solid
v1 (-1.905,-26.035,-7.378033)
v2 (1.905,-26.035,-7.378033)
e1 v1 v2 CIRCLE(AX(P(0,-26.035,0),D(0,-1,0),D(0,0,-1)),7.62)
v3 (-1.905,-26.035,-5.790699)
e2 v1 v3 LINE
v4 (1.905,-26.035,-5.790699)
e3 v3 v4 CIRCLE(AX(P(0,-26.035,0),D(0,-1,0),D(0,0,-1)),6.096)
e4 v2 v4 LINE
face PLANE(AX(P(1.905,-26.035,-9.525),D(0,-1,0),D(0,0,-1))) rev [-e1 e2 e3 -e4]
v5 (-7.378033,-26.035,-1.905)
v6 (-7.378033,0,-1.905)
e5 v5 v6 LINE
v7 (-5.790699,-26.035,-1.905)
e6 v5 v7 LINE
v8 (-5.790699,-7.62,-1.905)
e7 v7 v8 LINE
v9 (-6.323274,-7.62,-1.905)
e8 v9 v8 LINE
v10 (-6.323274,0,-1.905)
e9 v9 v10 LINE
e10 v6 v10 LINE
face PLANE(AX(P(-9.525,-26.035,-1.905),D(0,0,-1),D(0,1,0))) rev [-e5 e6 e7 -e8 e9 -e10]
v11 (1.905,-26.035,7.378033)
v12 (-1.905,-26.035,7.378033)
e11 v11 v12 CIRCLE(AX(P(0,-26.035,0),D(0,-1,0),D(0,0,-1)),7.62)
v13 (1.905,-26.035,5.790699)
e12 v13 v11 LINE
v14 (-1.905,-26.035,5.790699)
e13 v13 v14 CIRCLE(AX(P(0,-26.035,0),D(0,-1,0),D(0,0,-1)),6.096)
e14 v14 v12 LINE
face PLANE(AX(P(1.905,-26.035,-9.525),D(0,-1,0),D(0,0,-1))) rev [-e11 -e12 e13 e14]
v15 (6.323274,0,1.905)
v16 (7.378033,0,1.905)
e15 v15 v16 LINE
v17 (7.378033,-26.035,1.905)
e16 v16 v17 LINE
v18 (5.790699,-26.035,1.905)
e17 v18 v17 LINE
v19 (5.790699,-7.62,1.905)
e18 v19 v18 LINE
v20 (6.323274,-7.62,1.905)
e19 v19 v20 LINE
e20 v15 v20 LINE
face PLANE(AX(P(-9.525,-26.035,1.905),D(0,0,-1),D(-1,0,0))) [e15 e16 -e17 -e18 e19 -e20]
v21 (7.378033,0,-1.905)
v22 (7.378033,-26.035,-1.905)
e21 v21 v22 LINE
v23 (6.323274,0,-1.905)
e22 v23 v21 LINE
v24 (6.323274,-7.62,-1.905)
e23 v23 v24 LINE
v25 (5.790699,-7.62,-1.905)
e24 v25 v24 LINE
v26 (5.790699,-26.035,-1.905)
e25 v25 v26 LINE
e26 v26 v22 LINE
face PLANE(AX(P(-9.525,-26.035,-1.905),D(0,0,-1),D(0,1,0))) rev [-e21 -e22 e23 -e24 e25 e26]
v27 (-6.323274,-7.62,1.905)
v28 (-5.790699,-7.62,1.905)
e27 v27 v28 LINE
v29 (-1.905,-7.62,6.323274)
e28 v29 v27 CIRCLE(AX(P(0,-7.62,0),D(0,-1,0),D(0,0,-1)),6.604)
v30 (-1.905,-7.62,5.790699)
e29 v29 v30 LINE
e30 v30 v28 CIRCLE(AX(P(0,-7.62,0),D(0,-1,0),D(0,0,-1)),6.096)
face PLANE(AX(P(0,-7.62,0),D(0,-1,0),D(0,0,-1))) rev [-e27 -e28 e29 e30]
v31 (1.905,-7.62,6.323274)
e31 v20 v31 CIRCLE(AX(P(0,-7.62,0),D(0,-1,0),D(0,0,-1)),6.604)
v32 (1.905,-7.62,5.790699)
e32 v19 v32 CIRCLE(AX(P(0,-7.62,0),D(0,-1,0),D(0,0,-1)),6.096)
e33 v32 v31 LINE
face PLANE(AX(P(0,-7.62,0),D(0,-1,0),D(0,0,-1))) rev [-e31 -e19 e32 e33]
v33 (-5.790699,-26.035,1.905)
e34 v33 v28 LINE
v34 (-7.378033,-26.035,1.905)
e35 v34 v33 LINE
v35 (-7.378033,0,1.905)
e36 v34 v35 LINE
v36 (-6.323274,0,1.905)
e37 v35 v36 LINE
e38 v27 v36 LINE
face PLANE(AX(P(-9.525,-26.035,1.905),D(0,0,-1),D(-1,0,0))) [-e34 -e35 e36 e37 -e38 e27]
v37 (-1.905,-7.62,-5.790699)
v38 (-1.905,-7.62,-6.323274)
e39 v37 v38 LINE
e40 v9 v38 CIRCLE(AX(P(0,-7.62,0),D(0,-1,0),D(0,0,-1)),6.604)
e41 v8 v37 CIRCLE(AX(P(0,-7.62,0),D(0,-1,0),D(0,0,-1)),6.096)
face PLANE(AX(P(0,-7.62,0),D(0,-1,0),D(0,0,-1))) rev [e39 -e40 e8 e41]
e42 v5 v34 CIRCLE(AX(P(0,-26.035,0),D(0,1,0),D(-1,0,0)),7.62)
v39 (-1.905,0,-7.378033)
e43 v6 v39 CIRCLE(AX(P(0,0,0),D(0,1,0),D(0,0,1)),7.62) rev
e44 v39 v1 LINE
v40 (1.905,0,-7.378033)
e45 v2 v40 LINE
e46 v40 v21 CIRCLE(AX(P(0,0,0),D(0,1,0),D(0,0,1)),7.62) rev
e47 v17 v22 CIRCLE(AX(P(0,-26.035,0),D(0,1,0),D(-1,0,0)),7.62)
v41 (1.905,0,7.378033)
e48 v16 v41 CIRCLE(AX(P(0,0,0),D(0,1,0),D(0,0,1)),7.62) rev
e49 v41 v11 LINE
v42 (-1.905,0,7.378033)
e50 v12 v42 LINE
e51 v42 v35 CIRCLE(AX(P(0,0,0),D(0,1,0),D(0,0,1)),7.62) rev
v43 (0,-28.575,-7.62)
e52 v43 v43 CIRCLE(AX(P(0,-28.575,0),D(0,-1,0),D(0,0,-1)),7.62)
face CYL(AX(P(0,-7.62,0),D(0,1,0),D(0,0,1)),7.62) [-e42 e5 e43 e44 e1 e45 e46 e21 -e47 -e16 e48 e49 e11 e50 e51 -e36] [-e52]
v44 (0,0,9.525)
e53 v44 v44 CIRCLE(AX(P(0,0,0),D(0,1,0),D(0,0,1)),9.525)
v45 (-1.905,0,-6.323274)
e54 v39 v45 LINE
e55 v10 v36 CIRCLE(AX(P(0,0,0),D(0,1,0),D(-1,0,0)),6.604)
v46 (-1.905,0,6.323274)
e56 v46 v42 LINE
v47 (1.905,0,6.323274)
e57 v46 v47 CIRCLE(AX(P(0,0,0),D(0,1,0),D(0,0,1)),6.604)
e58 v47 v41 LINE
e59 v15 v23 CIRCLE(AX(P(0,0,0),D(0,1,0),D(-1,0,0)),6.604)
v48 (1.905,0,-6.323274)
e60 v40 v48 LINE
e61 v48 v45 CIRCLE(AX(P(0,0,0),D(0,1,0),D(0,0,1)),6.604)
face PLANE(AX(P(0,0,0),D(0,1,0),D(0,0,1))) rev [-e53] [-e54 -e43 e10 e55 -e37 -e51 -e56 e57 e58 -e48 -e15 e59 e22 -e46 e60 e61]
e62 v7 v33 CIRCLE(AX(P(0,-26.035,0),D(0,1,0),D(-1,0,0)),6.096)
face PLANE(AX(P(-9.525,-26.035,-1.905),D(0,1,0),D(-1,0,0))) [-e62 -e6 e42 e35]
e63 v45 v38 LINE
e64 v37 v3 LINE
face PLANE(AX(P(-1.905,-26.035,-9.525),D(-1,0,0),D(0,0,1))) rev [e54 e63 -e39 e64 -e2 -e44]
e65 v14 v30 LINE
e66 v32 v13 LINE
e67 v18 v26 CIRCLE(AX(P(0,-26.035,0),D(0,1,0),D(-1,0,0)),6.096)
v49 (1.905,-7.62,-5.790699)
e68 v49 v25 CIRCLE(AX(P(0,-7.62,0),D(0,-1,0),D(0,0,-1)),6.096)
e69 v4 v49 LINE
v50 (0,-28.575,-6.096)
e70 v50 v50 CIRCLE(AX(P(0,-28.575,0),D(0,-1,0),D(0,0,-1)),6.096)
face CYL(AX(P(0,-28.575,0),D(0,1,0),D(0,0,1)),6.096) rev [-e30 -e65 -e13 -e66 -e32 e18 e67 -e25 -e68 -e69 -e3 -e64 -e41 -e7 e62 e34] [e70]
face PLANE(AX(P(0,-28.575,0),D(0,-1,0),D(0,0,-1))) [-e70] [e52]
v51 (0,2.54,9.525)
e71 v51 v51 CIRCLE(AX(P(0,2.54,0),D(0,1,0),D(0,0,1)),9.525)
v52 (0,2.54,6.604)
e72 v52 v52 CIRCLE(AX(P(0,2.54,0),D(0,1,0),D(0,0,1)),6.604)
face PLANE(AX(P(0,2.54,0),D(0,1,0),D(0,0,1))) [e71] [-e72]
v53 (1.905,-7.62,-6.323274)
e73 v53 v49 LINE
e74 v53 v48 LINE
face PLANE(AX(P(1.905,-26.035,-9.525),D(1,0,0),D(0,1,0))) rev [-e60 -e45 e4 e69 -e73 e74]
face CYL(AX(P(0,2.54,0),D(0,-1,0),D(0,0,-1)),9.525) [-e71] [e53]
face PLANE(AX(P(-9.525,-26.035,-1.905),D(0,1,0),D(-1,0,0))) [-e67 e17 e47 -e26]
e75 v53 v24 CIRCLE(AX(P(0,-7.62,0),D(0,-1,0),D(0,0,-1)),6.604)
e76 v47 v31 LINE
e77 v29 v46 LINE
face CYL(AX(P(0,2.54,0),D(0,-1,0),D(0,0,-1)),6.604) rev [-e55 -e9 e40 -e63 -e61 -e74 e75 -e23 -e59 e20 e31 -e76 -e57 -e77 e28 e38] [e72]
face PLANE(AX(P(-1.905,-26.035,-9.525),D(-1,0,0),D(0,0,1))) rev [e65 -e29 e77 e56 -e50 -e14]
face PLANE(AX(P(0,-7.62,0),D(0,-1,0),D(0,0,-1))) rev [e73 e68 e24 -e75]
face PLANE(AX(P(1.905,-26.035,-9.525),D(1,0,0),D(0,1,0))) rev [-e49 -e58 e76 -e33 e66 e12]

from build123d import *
from build123d.topology import SkipClean

# Parameters (mm, degrees)
SKETCH1_R           = 9.525
SKETCH1_R_2         = 6.604
BOSS_EXTRUDE1_DEPTH = 2.54
BOSS_EXTRUDE2_START = 7.62
SKETCH2_R           = 7.62
SKETCH2_R_2         = 6.604
BOSS_EXTRUDE2_DEPTH = 7.62
BOSS_EXTRUDE3_START = 20.955
SKETCH3_R           = 7.62
SKETCH3_R_2         = 6.096
BOSS_EXTRUDE3_DEPTH = 20.955
SKETCH5_W           = 3.81
SKETCH5_H           = 26.035
CUT_EXTRUDE1_DEPTH  = 37.780699762
SKETCH7_W           = 3.81
SKETCH7_H           = 26.035
CUT_EXTRUDE2_DEPTH  = 37.780699762


with BuildPart() as part:
    # Sketch1 → Boss-Extrude1 (new body)
    with BuildSketch(Plane(origin=(0, 0, 0), x_dir=(1, 0, 0), z_dir=(0, 1, 0))):
        Circle(SKETCH1_R)
        Circle(SKETCH1_R_2, mode=Mode.SUBTRACT)
    extrude(amount=BOSS_EXTRUDE1_DEPTH)

    # Sketch2 → Boss-Extrude2 (add)
    with SkipClean():  # the faces are left unmerged after this step: merging them gives an invalid solid
        with BuildSketch(Plane(origin=(0, 0, 0), x_dir=(-1, 0, 0), z_dir=(0, -1, 0)).offset(BOSS_EXTRUDE2_START)):
            Circle(SKETCH2_R)
            Circle(SKETCH2_R_2, mode=Mode.SUBTRACT)
        extrude(amount=-BOSS_EXTRUDE2_DEPTH)

    # Sketch3 → Boss-Extrude3 (add)
    with SkipClean():  # the faces are left unmerged after this step: merging them gives an invalid solid
        with BuildSketch(Plane(origin=(0, -7.62, 0), x_dir=(-1, 0, 0), z_dir=(0, -1, 0)).offset(BOSS_EXTRUDE3_START)):
            Circle(SKETCH3_R)
            Circle(SKETCH3_R_2, mode=Mode.SUBTRACT)
        extrude(amount=-BOSS_EXTRUDE3_DEPTH)

    # Sketch5 → Cut-Extrude1 (cut, through all)
    with SkipClean():  # the faces are left unmerged after this step: merging them gives an invalid solid
        with BuildSketch(Plane(origin=(0, -28.575, 7.62), x_dir=(1, 0, 0), z_dir=(0, 0, 1))):
            with Locations((0, 15.5575)):
                Rectangle(SKETCH5_W, SKETCH5_H)
        extrude(amount=-CUT_EXTRUDE1_DEPTH, mode=Mode.SUBTRACT)

    # Sketch7 → Cut-Extrude2 (cut, through all)
    with SkipClean():  # the faces are left unmerged after this step: merging them gives an invalid solid
        with BuildSketch(Plane(origin=(7.62, -28.575, 0), x_dir=(0, 0, -1), z_dir=(1, 0, 0))):
            with Locations((0, 15.5575)):
                Rectangle(SKETCH7_W, SKETCH7_H)
        extrude(amount=-CUT_EXTRUDE2_DEPTH, mode=Mode.SUBTRACT)
    add(part.part.scale(1), mode=Mode.REPLACE)  # the faces are merged on a copy


solid = part.part
